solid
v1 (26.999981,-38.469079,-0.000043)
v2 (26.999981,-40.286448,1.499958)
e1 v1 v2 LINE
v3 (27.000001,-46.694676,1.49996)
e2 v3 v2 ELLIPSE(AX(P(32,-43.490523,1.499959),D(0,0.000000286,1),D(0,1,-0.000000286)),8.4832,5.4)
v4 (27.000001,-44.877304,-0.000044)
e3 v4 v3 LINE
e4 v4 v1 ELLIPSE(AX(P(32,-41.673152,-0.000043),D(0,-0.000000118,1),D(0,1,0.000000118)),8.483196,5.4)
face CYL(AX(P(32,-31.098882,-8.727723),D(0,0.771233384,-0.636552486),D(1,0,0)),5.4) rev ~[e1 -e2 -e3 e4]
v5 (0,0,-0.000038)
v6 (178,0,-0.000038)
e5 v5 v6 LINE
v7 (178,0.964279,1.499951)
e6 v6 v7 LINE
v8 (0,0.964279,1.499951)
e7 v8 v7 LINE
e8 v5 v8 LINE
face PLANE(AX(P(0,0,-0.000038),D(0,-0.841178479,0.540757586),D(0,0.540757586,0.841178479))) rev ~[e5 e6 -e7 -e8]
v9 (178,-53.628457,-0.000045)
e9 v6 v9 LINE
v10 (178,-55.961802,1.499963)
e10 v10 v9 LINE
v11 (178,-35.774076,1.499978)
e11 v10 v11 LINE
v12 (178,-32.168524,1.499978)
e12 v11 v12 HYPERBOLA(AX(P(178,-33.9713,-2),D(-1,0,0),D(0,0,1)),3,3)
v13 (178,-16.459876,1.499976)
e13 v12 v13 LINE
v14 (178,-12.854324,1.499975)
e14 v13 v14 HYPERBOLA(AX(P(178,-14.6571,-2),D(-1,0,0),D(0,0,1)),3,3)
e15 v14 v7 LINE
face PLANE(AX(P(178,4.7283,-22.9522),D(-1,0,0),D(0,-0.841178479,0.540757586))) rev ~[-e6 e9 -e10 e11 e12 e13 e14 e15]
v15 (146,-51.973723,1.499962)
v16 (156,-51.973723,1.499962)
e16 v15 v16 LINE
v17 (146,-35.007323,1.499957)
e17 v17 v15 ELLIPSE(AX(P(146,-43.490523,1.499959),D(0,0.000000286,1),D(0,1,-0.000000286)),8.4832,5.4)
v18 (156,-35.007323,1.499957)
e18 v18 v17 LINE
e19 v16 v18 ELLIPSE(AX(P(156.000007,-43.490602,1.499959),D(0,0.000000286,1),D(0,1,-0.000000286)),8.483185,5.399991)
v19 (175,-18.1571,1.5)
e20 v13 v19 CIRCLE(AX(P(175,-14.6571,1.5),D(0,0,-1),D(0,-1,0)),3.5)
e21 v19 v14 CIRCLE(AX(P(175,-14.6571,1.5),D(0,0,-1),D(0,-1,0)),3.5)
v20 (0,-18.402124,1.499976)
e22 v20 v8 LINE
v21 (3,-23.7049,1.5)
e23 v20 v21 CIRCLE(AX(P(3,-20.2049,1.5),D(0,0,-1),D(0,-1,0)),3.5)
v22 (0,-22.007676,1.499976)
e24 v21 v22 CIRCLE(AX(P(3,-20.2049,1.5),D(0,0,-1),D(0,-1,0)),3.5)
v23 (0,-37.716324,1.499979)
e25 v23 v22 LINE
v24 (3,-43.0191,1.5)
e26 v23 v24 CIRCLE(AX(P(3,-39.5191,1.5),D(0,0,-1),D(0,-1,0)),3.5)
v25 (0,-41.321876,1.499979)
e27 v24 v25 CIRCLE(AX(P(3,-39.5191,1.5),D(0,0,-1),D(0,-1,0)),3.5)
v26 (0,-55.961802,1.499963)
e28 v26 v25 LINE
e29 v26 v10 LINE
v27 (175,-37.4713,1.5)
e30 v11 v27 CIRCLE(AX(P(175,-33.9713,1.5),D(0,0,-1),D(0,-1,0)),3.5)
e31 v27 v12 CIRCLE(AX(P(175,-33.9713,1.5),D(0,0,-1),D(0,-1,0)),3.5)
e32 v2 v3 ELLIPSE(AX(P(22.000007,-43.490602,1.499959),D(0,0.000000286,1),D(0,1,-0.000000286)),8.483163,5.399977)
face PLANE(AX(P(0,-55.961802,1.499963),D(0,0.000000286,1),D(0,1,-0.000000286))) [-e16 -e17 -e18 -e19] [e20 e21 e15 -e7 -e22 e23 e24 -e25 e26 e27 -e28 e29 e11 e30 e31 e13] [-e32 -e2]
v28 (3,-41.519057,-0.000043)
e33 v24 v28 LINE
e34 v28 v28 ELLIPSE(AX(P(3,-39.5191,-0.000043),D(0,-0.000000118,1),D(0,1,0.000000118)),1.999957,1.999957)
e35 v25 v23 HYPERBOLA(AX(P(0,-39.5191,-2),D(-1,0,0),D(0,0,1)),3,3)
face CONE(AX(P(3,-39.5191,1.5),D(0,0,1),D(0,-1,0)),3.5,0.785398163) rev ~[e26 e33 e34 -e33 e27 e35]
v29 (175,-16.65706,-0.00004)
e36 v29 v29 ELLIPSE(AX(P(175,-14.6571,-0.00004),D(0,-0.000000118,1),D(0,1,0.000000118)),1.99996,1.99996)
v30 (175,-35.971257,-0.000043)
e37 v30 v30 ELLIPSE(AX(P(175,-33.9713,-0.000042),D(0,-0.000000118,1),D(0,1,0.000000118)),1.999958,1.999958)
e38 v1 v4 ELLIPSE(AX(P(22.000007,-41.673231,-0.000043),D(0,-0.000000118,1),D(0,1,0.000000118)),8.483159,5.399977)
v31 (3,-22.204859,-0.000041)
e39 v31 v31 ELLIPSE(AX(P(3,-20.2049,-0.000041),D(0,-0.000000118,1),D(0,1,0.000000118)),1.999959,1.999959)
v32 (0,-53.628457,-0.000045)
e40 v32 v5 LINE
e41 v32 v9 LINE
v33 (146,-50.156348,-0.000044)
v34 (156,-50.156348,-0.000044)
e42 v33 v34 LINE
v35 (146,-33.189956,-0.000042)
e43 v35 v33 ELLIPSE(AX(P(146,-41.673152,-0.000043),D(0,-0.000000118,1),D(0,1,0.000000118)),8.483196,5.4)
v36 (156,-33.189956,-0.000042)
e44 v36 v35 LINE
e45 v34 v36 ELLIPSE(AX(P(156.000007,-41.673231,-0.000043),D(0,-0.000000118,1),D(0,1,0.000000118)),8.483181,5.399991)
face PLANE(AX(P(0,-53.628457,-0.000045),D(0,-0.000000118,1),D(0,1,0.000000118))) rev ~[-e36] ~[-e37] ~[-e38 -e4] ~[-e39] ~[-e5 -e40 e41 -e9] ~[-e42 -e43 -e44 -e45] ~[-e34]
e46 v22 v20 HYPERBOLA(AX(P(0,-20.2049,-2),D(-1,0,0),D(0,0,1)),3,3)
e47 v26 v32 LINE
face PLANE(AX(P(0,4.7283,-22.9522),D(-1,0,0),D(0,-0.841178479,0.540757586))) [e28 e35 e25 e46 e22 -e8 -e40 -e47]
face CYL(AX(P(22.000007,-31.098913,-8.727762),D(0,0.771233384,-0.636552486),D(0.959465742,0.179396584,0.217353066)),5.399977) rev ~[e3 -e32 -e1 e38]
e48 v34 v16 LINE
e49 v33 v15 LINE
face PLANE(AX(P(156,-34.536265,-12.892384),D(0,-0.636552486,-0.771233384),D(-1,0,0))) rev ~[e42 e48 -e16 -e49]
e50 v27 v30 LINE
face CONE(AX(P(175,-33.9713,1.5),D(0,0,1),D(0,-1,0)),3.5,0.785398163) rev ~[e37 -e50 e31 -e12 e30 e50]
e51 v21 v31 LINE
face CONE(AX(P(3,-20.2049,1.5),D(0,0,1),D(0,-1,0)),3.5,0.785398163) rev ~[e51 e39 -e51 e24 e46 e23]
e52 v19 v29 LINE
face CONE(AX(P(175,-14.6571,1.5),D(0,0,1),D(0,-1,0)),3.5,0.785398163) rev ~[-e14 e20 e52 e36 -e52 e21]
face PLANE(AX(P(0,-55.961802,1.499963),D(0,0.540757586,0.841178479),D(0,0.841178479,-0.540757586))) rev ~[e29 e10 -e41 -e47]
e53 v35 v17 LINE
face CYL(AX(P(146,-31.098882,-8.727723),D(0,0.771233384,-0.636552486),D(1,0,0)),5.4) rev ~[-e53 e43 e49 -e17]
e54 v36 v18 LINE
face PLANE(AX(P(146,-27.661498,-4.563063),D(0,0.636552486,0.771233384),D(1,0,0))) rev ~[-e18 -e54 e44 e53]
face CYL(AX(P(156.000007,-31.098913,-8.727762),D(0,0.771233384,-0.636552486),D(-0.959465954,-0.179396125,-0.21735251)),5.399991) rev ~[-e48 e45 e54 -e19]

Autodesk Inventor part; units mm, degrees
ref_plane "YZ Plane" through (0, 0, 0) normal (1, 0, 0) x (0, 1, 0)
ref_plane "XZ Plane" through (0, 0, 0) normal (0, 1, 0) x (-1, 0, 0)
ref_plane "Work Plane1" through (0, 4.7283, -22.9522) normal (-1, 0, 0) x (0, -0.8411785, 0.5407576)
sketch "Sketch1" plane through (0, 4.7283, -22.9522) normal (-1, 0, 0) x (0, -0.8411785, 0.5407576)
  line L0 (61.5, -12.25) -> (61.5, -16.75) projected
  line L1 (61.5, -16.75) -> (65.5, -16.75) projected
  line L2 (65.5, -16.75) -> (65.5, -20.25) projected
  line L3 (65.5, -20.25) -> (79.5, -20.25) projected
  line L4 (79.5, -20.25) -> (65.5, -11.25) projected
  line L5 (65.5, -11.25) -> (65.5, -12.25) projected
  line L6 (65.5, -12.25) -> (61.5, -12.25) projected
  line L7 (16.3889, 16.75) -> (16.3889, 18.75) projected
  line L8 (14.7421, 12.75) -> (16.3889, 18.75)
  line L9 (64.2739, -12.25) -> (12.3502, 21.1295)
  line L10 (16.3889, 16.75) -> (16.3889, 18.5332)
  arc A0 (-57.551, -16.75) -> (-61.5, -12.801) centre (-58.75, -14) ccw projected
  arc A1 (-34.301, -16.75) -> (-36.699, -16.75) centre (-35.5, -14) ccw projected
  line L11 (61.5, -12.25) -> (16.3889, 16.75) projected
  line L12 (16.3889, 13.75) -> (-61.5, 13.75) projected
  line L13 (-61.5, 13.75) -> (-61.5, -12.801) projected
  line L14 (-61.5, 13.75) -> (-61.5, -12.801) projected
  arc A2 (-57.551, -16.75) -> (-61.5, -12.801) centre (-58.75, -14) ccw projected
  line L15 (-57.551, -16.75) -> (-36.699, -16.75) projected
  arc A3 (-34.301, -16.75) -> (-36.699, -16.75) centre (-35.5, -14) ccw projected
  line L16 (-34.301, -16.75) -> (61.5, -16.75) projected
  line L17 (61.5, -16.75) -> (61.5, -12.25) projected
  line L18 (21.0556, 13.75) -> (-61.5, 13.75) projected
  line L19 (-57.551, -16.75) -> (-36.699, -16.75) projected
  line L20 (-34.301, -16.75) -> (61.5, -16.75) projected
  line L21 (61.5, -16.75) -> (61.5, -12.25) projected
  line L22 (61.5, -12.25) -> (21.0556, 13.75) projected
  point P0 (16.3889, 18.5332)
  point P1 (15.5655, 15.75)
  point P2 (16.3889, 18.5332)
  point P3 (16.3383, 18.5657)
  dimension "d14" = 1.5
  dimension "d15" = 2
ref_plane "Work Plane2" through (178, -56.0619, -70.2985) normal (1, 0, 0) x (0, 0.8411785, -0.5407576)
extrude "Extrusion1" add sketch "Sketch1" against normal up to surface (178 mm away) contours L11 L7 L9 L6
sketch "Sketch2" plane through (0, -55.9618, 1.5) normal (0, 0, 1) x (1, 0, 0)
  circle A0 centre (3, 16.4427) radius 2.5 projected
  circle A1 centre (3, 35.7569) radius 2.5 projected
  line L0 (0, 2.3333) -> (0, 55.9618) projected
  line L1 (0, 2.3333) -> (3, 2.3333) projected
  line L2 (6, 50.414) -> (6, 9.4662) projected
  line L3 (0, 50.414) -> (6, 50.414) projected
  circle A2 centre (175, 21.9904) radius 2.5 projected
  circle A3 centre (175, 41.3047) radius 2.5 projected
  line L4 (178, 2.3333) -> (178, 55.9618) projected
  line L5 (178, 55.9618) -> (172, 55.9618) projected
  line L6 (172, 55.9618) -> (172, 2.3333) projected
  line L7 (178, 2.3333) -> (172, 2.3333) projected
  line L8 (3, 9.4662) -> (3, 2.3333) projected
  line L9 (3, 9.4662) -> (6, 9.4662) projected
  point P0 (3, 35.7569)
  point P1 (3, 16.4427)
hole "Hole1" at (3, -20.2049, 1.5) at (3, -39.5191, 1.5) at (175, -33.9713, 1.5) at (175, -14.6571, 1.5) direction (0, 0, -1) diameter 3.6 end through all countersink diameter 7 countersink angle 90 clearance for "Countersunk Flat Head Screw ISO 2009/7046" size "M3" standard "ISO"
ref_plane "Work Plane3" through (22, -31.0502, -8.6656) normal (0, -0.7712334, 0.6365525) x (1, 0, 0)
sketch "Sketch3" plane through (22, -31.0502, -8.6656) normal (0, -0.7712334, 0.6365525) x (1, 0, 0)
  line L0 (-9.9215, 5.3729) -> (-9.9215, -5.5323)
  spline S0 degree 3 poles (-9.9215, -5.5323) (-9.9222, -5.6561) (-9.8204, -5.8999) (-9.5772, -6.0011) (-9.4534, -6.0004) knots 0 0 0 0 0.5 1 1 1 1
  line L1 (-9.4534, -6.0004) -> (19.4534, -6.0004)
  spline S1 degree 3 poles (19.4534, -6.0004) (19.5775, -6.0011) (19.8219, -5.8989) (19.9222, -5.6548) (19.9215, -5.5307) knots 0 0 0 0 0.5 1 1 1 1
  line L2 (19.9215, -5.5307) -> (19.9215, 5.3744)
  spline S2 degree 3 poles (19.9215, 5.3744) (19.9222, 5.4985) (19.82, 5.743) (19.5758, 5.8433) (19.4518, 5.8426) knots 0 0 0 0 0.5 1 1 1 1
  line L3 (19.4518, 5.8426) -> (-9.4534, 5.8426)
  spline S3 degree 3 poles (-9.4534, 5.8426) (-9.5775, 5.8433) (-9.8219, 5.7411) (-9.9222, 5.4969) (-9.9215, 5.3729) knots 0 0 0 0 0.5 1 1 1 1
  circle A0 centre (-8.3791, -4.458) radius 0.5
  circle A1 centre (-8.3791, 4.3001) radius 0.5
  circle A2 centre (18.3791, 4.3001) radius 0.5
  circle A3 centre (18.3791, -4.458) radius 0.5
  arc A4 (5.2617, -1.5301) -> (5.1811, -1.6008) centre (5.2771, -1.6289) ccw
  arc A5 (5.1811, 1.4429) -> (5.1811, -1.6008) centre (0, -0.0789) ccw
  arc A6 (5.1811, 1.4429) -> (5.2617, 1.3723) centre (5.2771, 1.4711) ccw
  arc A7 (5.2617, 1.3723) -> (5.3414, 1.4401) centre (5.2463, 1.4711) ccw
  arc A8 (5.3414, -1.5979) -> (5.3414, 1.4401) centre (10, -0.0789) ccw
  arc A9 (5.3414, -1.5979) -> (5.2617, -1.5301) centre (5.2463, -1.6289) ccw
  line L4 (143.9215, 5.3729) -> (143.9215, -5.5323)
  spline S4 degree 3 poles (143.4534, 5.8426) (143.5775, 5.8433) (143.8219, 5.7411) (143.9222, 5.4969) (143.9215, 5.3729) knots 0 0 0 0 0.5 1 1 1 1
  line L5 (114.5482, 5.8426) -> (143.4534, 5.8426)
  spline S5 degree 3 poles (114.0785, 5.3744) (114.0778, 5.4985) (114.18, 5.743) (114.4242, 5.8433) (114.5482, 5.8426) knots 0 0 0 0 0.5 1 1 1 1
  line L6 (114.0785, -5.5307) -> (114.0785, 5.3744)
  spline S6 degree 3 poles (114.5466, -6.0004) (114.4225, -6.0011) (114.1781, -5.8989) (114.0778, -5.6548) (114.0785, -5.5307) knots 0 0 0 0 0.5 1 1 1 1
  line L7 (143.4534, -6.0004) -> (114.5466, -6.0004)
  spline S7 degree 3 poles (143.9215, -5.5323) (143.9222, -5.6561) (143.8204, -5.8999) (143.5772, -6.0011) (143.4534, -6.0004) knots 0 0 0 0 0.5 1 1 1 1
  circle A10 centre (142.3791, -4.458) radius 0.5
  circle A11 centre (142.3791, 4.3001) radius 0.5
  circle A12 centre (115.6209, 4.3001) radius 0.5
  circle A13 centre (115.6209, -4.458) radius 0.5
  arc A14 (128.8189, -1.6008) -> (128.7383, -1.5301) centre (128.7229, -1.6289) ccw
  arc A15 (128.7383, -1.5301) -> (128.6586, -1.5979) centre (128.7537, -1.6289) ccw
  arc A16 (128.6586, 1.4401) -> (128.6586, -1.5979) centre (124, -0.0789) ccw
  arc A17 (128.6586, 1.4401) -> (128.7383, 1.3723) centre (128.7537, 1.4711) ccw
  arc A18 (128.7383, 1.3723) -> (128.8189, 1.4429) centre (128.7229, 1.4711) ccw
  arc A19 (128.8189, -1.6008) -> (128.8189, 1.4429) centre (134, -0.0789) ccw
  circle A20 centre (10, -0.0789) radius 5.4
  circle A21 centre (124, -0.0789) radius 5.4
  line L8 (0, 5.3211) -> (10, 5.3211)
  line L9 (10, -5.4789) -> (0, -5.4789)
  line L10 (124, 5.3211) -> (134, 5.3211)
  line L11 (134, -5.4789) -> (124, -5.4789)
  point P0 (-22, 26.4483)
  point P1 (14.6373, -1.6617)
  point P2 (5, 1.9607)
  point P3 (5.3627, -1.6617)
  point P4 (5, -2.1185)
  point P5 (7.5029, -4.2949)
  point P6 (3.3743, -4.2949)
  point P7 (5.2923, -1.5401)
  dimension "d9" = 10.8
  dimension "d10" = 10.8
extrude "Extrusion2" cut sketch "Sketch3" along normal blind 78.25 contours A9 A8 A7 A6 A5 A20 A4 | A4 A5 A20 A6 A7 A8 A9 | A5 A20 | A19 A21 A18 A17 A16 A15 A14 | A14 A15 A16 A17 A18 A19 A21 | A21 A19 | A19 L11 A21 | A19 A21 L10
properties part number "front" material "Aluminum 6061"
